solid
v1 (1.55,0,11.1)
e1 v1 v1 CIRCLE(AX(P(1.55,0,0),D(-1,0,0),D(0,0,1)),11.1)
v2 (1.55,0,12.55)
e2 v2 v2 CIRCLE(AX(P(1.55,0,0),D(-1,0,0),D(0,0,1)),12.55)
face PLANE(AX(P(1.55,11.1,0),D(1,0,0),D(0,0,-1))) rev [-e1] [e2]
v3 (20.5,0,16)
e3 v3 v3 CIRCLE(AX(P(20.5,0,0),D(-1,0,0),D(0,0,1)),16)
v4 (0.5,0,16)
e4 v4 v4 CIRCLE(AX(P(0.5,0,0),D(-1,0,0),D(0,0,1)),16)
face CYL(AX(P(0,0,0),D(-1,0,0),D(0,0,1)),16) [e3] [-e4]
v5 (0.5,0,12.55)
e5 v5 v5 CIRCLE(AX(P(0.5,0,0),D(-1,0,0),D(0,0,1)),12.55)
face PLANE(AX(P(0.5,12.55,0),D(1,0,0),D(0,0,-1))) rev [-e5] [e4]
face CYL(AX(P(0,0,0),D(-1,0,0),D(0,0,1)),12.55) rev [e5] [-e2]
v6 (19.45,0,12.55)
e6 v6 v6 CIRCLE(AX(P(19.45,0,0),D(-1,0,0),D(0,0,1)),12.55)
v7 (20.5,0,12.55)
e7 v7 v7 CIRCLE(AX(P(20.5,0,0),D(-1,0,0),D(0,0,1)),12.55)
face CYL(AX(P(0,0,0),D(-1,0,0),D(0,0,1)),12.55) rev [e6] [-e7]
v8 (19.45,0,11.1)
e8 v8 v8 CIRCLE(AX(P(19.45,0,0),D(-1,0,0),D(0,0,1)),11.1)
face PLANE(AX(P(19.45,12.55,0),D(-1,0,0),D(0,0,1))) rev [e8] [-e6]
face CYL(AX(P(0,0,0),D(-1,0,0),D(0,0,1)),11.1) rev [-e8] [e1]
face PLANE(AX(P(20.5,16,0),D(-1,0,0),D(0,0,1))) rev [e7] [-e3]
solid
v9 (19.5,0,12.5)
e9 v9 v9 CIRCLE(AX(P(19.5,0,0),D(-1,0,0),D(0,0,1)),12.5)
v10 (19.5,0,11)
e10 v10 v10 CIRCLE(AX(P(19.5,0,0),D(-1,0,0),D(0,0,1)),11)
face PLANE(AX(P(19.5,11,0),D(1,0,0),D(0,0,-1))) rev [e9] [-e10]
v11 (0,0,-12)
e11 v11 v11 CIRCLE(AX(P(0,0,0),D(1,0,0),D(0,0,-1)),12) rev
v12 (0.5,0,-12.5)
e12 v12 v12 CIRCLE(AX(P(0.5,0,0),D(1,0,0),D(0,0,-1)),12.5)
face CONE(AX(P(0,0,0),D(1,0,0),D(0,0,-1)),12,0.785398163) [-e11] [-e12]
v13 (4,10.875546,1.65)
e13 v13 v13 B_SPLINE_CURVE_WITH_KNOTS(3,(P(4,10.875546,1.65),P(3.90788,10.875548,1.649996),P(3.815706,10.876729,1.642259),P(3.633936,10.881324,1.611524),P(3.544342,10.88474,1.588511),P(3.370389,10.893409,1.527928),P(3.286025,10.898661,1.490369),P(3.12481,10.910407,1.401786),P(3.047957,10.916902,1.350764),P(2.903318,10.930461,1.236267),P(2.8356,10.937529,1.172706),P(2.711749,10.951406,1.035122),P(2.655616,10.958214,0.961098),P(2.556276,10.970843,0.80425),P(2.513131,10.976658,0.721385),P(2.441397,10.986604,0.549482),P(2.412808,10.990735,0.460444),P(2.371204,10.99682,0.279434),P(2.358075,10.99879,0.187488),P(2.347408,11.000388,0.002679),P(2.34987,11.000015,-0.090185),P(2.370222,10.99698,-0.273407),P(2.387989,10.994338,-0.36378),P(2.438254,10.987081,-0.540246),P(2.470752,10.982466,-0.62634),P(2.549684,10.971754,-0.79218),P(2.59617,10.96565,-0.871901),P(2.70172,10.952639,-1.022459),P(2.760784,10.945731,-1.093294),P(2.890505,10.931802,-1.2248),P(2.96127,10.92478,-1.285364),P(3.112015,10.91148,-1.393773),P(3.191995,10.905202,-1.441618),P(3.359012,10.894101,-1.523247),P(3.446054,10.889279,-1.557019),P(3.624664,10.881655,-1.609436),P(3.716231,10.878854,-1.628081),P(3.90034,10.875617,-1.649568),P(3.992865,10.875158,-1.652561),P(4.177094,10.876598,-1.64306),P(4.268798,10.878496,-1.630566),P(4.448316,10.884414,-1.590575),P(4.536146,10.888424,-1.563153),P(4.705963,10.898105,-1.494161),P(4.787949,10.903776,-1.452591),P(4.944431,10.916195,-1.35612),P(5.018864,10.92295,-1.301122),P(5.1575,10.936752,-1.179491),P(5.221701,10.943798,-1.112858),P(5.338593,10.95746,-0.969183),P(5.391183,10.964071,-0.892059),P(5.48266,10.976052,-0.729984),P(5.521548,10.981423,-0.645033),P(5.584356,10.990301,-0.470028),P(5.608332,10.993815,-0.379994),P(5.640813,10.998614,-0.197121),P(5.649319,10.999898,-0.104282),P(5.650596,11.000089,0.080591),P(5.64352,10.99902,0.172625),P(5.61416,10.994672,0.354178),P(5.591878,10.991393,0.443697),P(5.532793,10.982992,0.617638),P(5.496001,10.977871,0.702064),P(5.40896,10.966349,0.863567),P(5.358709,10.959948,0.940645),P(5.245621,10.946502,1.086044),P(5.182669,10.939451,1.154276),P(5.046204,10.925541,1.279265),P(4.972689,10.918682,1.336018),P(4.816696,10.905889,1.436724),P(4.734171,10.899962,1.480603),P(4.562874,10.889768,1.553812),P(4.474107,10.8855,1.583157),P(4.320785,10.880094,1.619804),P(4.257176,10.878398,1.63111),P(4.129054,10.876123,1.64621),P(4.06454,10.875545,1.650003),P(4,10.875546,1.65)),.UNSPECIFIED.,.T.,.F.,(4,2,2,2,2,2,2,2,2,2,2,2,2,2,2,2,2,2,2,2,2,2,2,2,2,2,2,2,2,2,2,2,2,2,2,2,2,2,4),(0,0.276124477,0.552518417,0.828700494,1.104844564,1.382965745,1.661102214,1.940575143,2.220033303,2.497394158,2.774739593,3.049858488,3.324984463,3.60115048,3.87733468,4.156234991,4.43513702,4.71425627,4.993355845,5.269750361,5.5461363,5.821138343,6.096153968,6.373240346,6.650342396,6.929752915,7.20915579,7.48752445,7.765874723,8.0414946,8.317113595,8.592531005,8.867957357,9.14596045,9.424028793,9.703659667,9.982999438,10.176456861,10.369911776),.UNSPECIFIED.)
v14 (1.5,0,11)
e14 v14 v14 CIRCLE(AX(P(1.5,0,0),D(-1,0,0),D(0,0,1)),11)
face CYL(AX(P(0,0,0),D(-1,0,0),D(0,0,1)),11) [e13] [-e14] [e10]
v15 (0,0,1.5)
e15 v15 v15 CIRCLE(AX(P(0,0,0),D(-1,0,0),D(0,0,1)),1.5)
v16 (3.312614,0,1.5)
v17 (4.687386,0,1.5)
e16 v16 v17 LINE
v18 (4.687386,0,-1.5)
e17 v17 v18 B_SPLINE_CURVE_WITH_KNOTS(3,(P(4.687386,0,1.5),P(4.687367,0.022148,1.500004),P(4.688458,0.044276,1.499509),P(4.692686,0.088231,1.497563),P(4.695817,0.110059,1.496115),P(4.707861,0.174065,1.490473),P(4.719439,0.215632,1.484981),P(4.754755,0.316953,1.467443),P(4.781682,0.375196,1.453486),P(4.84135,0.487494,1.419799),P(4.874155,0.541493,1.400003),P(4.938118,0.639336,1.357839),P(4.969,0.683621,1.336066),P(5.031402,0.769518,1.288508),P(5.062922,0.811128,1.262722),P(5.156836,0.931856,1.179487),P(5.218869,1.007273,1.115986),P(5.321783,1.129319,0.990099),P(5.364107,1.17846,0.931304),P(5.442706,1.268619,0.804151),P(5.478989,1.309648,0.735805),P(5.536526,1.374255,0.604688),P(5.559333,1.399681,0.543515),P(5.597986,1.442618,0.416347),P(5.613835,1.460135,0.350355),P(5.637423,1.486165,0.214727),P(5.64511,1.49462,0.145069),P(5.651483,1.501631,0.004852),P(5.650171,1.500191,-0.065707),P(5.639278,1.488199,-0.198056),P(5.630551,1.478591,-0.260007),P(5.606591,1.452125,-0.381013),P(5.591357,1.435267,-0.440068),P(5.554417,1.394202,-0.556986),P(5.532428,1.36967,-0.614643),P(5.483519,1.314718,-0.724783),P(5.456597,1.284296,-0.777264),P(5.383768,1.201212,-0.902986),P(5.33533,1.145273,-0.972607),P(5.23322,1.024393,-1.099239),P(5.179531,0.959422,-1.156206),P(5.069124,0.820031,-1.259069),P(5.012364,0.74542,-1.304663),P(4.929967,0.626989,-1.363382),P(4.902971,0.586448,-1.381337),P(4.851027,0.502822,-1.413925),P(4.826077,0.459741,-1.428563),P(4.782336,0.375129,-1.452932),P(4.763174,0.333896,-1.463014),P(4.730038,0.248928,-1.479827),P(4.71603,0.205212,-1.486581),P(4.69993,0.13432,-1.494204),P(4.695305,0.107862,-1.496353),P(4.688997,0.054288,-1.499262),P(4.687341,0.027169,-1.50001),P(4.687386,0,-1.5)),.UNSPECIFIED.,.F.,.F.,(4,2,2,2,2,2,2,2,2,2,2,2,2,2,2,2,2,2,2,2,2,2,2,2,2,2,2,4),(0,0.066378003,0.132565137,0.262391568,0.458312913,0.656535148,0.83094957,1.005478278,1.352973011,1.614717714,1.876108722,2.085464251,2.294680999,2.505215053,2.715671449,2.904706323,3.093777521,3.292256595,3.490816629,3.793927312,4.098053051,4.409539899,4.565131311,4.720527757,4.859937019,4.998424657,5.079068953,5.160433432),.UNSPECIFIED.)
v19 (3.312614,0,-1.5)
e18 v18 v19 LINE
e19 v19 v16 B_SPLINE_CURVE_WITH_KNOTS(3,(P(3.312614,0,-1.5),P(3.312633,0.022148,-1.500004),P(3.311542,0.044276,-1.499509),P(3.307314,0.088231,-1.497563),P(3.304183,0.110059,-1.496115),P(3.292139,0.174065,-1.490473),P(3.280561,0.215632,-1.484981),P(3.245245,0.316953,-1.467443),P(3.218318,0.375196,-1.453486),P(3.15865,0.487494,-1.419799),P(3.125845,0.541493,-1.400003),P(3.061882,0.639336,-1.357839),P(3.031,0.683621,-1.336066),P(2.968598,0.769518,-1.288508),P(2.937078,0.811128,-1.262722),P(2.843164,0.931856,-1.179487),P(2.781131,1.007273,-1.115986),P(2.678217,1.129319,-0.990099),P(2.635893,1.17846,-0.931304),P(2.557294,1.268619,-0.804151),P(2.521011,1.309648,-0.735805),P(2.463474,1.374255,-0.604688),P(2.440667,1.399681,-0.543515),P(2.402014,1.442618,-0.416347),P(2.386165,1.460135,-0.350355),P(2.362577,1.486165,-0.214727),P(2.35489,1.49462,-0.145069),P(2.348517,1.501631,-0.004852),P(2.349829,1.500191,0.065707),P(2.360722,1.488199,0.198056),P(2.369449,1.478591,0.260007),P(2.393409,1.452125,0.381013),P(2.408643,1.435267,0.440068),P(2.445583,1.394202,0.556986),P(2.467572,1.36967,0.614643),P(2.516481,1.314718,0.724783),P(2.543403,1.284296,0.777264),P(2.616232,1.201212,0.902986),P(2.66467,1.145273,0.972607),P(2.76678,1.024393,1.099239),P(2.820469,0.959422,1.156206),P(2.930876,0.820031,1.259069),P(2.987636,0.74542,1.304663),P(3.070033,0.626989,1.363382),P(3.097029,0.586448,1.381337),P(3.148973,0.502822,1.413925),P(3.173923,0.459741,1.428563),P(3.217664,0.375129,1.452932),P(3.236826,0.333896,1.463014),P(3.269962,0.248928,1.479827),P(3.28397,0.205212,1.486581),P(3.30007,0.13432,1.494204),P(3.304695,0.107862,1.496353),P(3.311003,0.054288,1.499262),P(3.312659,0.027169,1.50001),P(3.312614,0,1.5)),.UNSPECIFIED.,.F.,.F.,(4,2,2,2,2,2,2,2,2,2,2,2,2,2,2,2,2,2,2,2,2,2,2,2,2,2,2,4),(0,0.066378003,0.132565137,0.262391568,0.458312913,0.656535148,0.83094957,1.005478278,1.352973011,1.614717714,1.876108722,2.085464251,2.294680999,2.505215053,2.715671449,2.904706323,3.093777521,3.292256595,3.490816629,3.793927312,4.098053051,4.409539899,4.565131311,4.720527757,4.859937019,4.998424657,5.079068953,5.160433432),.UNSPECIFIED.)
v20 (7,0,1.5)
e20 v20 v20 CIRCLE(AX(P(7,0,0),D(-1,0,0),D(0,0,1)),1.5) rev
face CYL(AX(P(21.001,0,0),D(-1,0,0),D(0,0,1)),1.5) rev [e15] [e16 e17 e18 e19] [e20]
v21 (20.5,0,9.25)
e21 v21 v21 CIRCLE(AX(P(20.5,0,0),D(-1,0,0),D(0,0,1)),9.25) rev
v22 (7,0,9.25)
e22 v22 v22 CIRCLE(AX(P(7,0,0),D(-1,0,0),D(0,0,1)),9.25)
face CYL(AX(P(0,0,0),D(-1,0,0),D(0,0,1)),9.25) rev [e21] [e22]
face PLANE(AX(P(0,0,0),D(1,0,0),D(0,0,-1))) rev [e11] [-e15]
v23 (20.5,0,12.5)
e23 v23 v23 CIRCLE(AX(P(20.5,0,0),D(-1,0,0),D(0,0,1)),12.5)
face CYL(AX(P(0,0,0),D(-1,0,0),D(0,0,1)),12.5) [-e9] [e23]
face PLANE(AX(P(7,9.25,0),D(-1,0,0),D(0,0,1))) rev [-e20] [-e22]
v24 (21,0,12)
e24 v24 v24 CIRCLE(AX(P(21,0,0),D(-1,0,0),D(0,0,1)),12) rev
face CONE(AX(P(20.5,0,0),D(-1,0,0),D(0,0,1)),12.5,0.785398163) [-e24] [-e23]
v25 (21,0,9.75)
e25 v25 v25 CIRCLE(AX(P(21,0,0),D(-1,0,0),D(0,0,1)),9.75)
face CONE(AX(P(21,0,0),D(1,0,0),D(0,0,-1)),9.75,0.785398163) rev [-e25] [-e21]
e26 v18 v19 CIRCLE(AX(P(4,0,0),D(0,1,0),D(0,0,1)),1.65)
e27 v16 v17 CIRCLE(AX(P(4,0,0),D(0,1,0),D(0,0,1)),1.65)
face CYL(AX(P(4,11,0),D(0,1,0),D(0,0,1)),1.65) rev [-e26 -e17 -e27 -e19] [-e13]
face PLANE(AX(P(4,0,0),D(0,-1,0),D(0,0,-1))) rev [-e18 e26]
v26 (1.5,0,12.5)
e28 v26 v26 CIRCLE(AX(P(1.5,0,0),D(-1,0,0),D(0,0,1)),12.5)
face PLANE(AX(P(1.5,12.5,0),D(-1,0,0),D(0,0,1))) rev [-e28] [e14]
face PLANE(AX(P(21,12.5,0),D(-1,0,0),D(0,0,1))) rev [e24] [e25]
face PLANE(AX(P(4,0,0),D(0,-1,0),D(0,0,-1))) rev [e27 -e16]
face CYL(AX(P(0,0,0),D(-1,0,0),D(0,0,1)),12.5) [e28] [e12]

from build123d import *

# Parameters (mm, degrees)
CORTE_EXTRUS_O1_REACH         = 29.45
ESBO_O3_R                     = 1.5
FURO_ROSCADO_DE_M41_OUTLINE_R = 1.65
FURO_ROSCADO_DE_M41_DEPTH     = 11.000000058
CHANFRO1_SIZE                 = 0.5


# Read off the part's stored shape, not the designer's step: Furo roscado de M41
with BuildPart() as part:
    # Esboço2 → Revolução1 (revolve)
    with BuildSketch(Plane.XY, mode=Mode.PRIVATE) as revolu_o1_sk:
        Polygon((0, 0), (0, 12.5), (1.5, 12.5), (1.5, 11), (19.5, 11), (19.5, 12.5), (21, 12.5), (21, 9.25), (7, 9.25), (7, 0), align=None)
    revolve(revolu_o1_sk.sketch.rotate(Axis((0, 0, 0), (1, 0, 0)), 90), axis=Axis((0, 0, 0), (1, 0, 0)))

    # Esboço3 → Corte-extrusão1 (cut, up to next)
    with BuildSketch(Plane.ZY, mode=Mode.PRIVATE) as corte_extrus_o1_sk1:
        Circle(ESBO_O3_R)
    corte_extrus_o1_tool1 = extrude(corte_extrus_o1_sk1.sketch, amount=-CORTE_EXTRUS_O1_REACH, mode=Mode.PRIVATE) & part.part
    add(corte_extrus_o1_tool1.solids().sort_by_distance((0, 0, 0))[0], mode=Mode.SUBTRACT)

    # Furo roscado de M41 outline → Furo roscado de M41 (cut)
    with BuildSketch(Plane(origin=(0, 0, 0), x_dir=(1, 0, 0), z_dir=(0, 1, 0))):
        with Locations((4, 0)):
            Circle(FURO_ROSCADO_DE_M41_OUTLINE_R)
    extrude(amount=FURO_ROSCADO_DE_M41_DEPTH, mode=Mode.SUBTRACT)

    # Chanfro1
    chanfro1_edges = [part.edges().sort_by_distance(p)[0] for p in [
        (0, 0, -12.5),
        (21, 0, -9.25),
        (21, 0, -12.5),
    ]]
    chamfer(chanfro1_edges, length=CHANFRO1_SIZE)


with BuildPart() as body_2:
    # Esboço6 → Revolução2 (revolve)
    with BuildSketch(Plane.XY, mode=Mode.PRIVATE) as revolu_o2_sk:
        Polygon((1.55, 11.1), (1.55, 12.55), (0.5, 12.55), (0.5, 16), (20.5, 16), (20.5, 12.55), (19.45, 12.55), (19.45, 11.1), align=None)
    revolve(revolu_o2_sk.sketch.rotate(Axis((0, 0, 0), (1, 0, 0)), 90), axis=Axis((0, 0, 0), (1, 0, 0)))


solid = Compound([part.part, body_2.part])
